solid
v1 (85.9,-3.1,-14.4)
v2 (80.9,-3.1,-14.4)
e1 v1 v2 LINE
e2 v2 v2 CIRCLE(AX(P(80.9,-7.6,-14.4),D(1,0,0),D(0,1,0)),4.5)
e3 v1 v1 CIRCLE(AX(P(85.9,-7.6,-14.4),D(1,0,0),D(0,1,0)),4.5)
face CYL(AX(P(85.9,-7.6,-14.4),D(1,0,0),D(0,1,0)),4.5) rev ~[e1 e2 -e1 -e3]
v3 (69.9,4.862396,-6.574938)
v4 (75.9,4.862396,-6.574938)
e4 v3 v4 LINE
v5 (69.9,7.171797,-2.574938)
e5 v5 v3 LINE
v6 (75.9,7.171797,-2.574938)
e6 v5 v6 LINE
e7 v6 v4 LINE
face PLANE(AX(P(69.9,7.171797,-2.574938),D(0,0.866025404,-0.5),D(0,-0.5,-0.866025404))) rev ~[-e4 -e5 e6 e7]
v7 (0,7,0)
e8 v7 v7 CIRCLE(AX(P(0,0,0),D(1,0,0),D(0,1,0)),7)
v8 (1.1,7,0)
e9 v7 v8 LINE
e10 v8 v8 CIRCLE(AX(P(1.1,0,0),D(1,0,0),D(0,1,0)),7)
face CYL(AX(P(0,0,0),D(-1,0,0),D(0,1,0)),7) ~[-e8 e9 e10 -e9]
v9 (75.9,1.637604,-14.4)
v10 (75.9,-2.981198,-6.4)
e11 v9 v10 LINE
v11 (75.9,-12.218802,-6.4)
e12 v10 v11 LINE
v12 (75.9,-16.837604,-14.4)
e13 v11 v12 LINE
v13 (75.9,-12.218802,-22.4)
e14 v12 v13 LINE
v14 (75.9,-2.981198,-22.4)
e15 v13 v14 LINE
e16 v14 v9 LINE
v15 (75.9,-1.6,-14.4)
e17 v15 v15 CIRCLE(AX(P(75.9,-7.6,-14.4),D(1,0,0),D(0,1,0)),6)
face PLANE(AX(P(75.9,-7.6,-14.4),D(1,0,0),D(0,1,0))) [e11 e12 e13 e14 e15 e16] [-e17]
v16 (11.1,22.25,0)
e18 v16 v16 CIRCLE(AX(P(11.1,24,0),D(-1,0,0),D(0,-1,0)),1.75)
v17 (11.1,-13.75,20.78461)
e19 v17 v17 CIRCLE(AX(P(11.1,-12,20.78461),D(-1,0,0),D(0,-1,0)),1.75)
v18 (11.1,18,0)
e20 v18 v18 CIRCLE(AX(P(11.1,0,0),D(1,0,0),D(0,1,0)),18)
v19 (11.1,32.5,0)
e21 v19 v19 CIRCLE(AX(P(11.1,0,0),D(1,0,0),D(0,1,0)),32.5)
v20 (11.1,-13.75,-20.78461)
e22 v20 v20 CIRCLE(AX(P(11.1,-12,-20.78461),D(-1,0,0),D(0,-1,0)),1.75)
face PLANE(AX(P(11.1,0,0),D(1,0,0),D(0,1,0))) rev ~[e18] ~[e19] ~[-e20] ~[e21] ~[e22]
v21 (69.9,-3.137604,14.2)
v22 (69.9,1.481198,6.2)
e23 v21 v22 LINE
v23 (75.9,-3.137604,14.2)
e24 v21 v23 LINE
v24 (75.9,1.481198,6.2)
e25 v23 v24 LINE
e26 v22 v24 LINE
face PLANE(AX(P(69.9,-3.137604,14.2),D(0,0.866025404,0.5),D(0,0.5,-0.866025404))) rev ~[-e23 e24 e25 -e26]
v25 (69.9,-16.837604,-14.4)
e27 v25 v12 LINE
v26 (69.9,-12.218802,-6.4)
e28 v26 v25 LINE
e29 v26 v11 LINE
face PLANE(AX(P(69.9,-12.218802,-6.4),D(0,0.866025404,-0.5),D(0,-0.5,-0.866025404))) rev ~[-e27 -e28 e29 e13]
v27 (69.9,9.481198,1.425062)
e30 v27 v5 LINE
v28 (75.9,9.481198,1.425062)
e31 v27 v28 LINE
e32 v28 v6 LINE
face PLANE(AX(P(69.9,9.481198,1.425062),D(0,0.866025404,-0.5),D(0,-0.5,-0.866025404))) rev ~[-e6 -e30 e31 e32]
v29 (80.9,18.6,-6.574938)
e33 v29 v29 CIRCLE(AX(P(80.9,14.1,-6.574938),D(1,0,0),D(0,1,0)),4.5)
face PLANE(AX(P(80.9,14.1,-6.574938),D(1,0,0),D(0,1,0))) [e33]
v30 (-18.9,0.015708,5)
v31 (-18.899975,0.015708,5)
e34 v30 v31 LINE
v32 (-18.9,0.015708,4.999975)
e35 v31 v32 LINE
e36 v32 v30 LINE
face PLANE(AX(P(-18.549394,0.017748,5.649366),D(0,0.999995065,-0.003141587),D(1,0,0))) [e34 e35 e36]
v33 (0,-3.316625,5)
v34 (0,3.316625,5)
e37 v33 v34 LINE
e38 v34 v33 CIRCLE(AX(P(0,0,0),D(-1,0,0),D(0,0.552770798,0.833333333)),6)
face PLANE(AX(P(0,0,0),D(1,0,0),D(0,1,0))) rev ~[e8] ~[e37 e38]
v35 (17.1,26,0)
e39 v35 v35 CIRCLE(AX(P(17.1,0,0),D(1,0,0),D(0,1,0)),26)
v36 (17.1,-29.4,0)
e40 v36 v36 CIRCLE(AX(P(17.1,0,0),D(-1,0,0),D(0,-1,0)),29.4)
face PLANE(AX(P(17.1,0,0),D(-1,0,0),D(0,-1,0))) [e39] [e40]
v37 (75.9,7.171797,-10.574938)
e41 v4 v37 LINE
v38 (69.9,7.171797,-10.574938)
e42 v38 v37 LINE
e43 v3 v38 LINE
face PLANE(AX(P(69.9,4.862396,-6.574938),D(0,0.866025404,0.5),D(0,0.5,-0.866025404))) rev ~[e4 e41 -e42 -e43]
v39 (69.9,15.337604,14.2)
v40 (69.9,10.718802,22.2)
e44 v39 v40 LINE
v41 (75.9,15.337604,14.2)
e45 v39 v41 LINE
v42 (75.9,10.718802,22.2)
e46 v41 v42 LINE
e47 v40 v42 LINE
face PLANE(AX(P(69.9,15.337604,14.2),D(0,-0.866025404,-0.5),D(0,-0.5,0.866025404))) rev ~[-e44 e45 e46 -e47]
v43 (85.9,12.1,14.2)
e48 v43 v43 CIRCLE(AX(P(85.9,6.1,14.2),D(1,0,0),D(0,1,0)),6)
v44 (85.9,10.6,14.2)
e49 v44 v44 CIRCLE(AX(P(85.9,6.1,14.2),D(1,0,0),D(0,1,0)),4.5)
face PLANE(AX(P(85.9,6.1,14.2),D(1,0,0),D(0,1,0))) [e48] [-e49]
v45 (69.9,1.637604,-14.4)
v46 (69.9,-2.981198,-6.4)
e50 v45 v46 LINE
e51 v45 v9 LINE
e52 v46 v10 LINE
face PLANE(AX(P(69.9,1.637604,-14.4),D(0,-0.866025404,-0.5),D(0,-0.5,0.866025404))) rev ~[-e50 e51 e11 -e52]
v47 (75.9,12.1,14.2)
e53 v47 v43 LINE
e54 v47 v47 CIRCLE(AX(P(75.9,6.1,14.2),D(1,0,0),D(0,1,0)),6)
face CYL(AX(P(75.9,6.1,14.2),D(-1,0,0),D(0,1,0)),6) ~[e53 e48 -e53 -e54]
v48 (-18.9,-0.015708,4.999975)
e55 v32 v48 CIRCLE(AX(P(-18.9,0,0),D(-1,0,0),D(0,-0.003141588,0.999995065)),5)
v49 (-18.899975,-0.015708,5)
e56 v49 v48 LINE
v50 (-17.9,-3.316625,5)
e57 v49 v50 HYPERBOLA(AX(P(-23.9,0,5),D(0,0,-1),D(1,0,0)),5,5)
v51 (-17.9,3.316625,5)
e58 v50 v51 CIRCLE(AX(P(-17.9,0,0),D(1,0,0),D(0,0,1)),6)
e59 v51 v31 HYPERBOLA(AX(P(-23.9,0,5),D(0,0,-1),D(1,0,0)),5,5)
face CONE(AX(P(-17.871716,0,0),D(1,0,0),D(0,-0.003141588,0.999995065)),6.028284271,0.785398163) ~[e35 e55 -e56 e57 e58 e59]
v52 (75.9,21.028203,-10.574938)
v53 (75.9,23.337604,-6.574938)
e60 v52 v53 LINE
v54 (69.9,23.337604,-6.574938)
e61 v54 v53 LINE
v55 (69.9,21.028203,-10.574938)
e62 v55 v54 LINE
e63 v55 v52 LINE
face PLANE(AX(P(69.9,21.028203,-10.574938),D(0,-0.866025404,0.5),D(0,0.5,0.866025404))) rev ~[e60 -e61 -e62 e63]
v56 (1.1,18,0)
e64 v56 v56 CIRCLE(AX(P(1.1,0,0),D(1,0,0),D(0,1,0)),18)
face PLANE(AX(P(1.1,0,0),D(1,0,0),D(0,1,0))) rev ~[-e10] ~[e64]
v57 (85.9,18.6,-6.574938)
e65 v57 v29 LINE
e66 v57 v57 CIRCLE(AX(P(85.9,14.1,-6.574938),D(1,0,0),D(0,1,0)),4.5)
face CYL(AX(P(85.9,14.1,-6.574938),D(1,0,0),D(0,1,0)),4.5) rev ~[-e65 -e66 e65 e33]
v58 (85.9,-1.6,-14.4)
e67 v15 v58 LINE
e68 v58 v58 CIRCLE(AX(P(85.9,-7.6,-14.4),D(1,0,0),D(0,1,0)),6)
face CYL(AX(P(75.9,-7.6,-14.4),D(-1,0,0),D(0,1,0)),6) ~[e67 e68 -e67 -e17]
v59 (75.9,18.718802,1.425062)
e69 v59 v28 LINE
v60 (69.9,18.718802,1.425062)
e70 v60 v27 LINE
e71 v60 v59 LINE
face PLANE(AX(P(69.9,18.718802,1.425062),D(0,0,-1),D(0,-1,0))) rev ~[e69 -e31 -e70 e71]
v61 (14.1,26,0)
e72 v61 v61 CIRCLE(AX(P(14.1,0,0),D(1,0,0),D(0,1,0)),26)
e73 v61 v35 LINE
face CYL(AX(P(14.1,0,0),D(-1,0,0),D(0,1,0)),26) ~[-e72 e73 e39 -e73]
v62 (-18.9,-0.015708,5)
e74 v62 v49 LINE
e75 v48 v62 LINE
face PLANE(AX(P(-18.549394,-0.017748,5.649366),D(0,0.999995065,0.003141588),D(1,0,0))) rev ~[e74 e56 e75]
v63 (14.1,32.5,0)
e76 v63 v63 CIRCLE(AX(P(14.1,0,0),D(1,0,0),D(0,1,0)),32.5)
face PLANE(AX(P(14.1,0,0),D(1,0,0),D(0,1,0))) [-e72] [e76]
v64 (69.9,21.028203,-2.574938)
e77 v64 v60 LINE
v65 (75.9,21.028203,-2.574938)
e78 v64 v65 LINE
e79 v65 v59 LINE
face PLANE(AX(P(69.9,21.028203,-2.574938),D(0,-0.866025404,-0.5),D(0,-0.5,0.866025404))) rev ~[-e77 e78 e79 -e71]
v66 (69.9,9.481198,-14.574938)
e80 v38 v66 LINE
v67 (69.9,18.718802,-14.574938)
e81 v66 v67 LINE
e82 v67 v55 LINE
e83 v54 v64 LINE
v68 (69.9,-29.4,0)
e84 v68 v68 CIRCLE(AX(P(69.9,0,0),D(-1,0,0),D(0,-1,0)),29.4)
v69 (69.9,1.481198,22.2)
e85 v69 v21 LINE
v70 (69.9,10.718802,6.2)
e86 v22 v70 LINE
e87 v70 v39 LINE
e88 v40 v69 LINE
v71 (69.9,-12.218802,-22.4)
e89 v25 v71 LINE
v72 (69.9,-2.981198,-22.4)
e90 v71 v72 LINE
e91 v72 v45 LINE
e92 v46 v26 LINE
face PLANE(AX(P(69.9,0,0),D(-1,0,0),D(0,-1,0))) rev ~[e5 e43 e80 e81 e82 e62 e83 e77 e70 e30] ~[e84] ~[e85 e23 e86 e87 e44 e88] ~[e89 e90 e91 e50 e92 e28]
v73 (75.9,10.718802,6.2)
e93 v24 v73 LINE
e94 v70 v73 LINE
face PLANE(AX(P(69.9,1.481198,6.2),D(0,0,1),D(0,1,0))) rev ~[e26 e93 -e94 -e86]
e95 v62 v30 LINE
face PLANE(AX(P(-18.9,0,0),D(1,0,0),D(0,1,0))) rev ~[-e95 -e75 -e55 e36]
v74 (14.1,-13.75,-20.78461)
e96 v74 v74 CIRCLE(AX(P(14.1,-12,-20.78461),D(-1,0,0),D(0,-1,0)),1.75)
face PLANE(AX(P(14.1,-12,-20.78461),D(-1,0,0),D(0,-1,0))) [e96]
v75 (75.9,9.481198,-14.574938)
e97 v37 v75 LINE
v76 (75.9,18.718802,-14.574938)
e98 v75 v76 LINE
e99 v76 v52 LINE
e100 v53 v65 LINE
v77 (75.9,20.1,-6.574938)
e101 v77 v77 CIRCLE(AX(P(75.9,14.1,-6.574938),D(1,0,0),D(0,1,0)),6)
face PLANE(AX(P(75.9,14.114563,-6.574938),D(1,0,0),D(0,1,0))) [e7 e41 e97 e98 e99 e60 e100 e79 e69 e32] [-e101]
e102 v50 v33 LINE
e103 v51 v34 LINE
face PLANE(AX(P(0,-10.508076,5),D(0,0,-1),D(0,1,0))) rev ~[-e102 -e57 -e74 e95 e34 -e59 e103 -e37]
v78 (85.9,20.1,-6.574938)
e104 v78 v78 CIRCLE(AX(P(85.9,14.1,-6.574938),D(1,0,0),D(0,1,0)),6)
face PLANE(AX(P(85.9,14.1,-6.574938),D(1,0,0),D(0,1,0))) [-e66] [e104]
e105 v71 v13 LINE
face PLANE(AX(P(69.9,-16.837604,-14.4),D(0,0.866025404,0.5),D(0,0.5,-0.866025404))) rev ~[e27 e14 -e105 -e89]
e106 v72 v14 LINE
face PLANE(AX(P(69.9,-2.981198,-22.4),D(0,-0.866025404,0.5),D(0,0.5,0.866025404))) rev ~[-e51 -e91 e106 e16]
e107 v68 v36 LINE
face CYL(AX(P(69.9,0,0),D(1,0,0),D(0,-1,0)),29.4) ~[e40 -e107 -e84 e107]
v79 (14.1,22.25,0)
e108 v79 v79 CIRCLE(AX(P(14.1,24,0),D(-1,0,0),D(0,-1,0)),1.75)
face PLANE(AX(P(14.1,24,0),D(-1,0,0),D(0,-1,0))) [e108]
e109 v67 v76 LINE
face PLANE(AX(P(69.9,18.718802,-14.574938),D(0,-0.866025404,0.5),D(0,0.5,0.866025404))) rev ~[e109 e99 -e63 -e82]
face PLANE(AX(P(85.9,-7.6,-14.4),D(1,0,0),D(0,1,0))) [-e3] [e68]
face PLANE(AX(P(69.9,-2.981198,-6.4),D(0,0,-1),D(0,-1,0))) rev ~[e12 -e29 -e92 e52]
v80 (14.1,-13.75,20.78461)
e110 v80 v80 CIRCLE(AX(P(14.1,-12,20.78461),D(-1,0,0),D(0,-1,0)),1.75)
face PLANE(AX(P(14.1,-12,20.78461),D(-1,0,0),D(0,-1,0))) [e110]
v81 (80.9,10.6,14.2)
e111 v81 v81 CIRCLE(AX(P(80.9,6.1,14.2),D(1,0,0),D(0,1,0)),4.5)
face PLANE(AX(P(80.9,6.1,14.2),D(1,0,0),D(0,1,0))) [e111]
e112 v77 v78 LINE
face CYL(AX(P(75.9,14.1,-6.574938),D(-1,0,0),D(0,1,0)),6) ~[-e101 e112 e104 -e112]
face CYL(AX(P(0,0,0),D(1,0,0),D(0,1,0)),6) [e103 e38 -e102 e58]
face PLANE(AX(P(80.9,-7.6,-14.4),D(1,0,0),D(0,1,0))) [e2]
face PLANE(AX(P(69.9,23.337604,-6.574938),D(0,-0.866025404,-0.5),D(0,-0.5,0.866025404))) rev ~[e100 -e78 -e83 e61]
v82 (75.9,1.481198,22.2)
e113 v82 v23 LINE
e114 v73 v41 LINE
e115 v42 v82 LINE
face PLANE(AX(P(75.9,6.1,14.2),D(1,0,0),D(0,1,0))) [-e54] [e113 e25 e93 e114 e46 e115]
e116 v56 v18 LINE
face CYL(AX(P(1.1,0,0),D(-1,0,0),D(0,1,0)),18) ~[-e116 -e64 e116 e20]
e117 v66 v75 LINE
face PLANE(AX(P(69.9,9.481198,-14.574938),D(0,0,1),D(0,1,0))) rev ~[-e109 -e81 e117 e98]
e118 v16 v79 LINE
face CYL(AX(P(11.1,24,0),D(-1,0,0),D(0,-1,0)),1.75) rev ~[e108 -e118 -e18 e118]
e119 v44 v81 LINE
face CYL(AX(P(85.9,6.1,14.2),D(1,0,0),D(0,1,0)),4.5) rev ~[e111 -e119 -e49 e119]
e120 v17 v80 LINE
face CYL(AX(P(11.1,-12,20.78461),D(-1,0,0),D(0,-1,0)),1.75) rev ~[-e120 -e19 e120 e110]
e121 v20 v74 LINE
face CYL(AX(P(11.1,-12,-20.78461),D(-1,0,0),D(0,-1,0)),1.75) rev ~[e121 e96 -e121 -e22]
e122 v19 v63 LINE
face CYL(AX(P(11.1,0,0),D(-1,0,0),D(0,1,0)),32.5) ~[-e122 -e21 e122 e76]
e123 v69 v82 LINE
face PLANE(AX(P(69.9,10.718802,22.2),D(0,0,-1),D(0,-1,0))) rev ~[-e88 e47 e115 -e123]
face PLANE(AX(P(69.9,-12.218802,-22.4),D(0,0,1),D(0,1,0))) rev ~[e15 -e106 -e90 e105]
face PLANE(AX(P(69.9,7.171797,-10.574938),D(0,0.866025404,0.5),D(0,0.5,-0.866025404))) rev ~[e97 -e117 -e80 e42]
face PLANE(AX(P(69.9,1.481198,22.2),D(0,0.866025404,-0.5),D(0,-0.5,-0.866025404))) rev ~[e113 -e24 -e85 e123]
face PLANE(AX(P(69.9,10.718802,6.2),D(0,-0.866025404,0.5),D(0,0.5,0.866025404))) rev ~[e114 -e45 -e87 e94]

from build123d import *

# Parameters (mm, degrees)
F0_R        = 6
F1_DEPTH    = 18.9
F2_W        = 21.1690347642
F2_H        = 4.931249544
F3_DEPTH    = 18.901
F4_T2_ANGLE = 359.64
F5_R        = 7
F6_DEPTH    = 1.1
F7_R        = 18
F8_DEPTH    = 10
F9_R        = 32.5
F10_DEPTH   = 3
F11_R       = 26
F12_DEPTH   = 3
F14_R       = 29.4
F15_DEPTH   = 52.8
F16_R       = 1.75
F17_DEPTH   = 3
F19_DEPTH   = 6
F20_R       = 6
F21_DEPTH   = 10
F22_R       = 4.5
F23_DEPTH   = 5


# Not quite as in the source:
# - a fillet or chamfer that OpenCascade refuses, or shapes differently, is made with other operations: its cross-section is extruded or revolved along the edge and cut away or added


with BuildPart() as f1:
    # F0 (on Right) → F1 (new body)
    with BuildSketch(Plane.YZ):
        Circle(F0_R)
    extrude(amount=-F1_DEPTH)

    # F2 (on Right) → F3 (cut, through all)
    with BuildSketch(Plane.YZ):
        with Locations((0.0764410943, 7.465624772)):
            Rectangle(F2_W, F2_H)
    extrude(amount=-F3_DEPTH, mode=Mode.SUBTRACT)

    # F4: chamfer of 1 on 1 edges, made by hand

    # F4_s1 → F4_t2 (revolve, cut)
    with BuildSketch(Plane(origin=(0, 0, 0), x_dir=(1, 0, 0), z_dir=(0, 0.9999950652, 0.0031415875))):
        with BuildLine():
            Line((-17.8717157288, -6.0282842712), (-18.9282842712, -4.9717157288))
            Line((-18.9282842712, -4.9717157288), (-18.9482842712, -4.9717157288))
            ThreePointArc((-18.9482842712, -4.9717157288), (-18.92, -5.4858578644), (-18.92, -6))
            Line((-18.92, -6), (-18.9, -6.02))
            ThreePointArc((-18.9, -6.02), (-18.3858578644, -6.02), (-17.8717157288, -6.0482842712))
            Line((-17.8717157288, -6.0482842712), (-17.8717157288, -6.0282842712))
        make_face()
    revolve(axis=Axis((-18.9, 0, 0), (1, 0, 0)), revolution_arc=F4_T2_ANGLE, mode=Mode.SUBTRACT)

    # F5 (on face) → F6 (join)
    with BuildSketch(Plane.YZ):
        Circle(F5_R)
    extrude(amount=F6_DEPTH)

    # F7 (on face) → F8 (join)
    with BuildSketch(Plane.YZ.offset(1.1)):
        Circle(F7_R)
    extrude(amount=F8_DEPTH)

    # F9 (on face) → F10 (join)
    with BuildSketch(Plane.YZ.offset(11.1)):
        Circle(F9_R)
    extrude(amount=F10_DEPTH)

    # F11 (on face) → F12 (join)
    with BuildSketch(Plane.YZ.offset(14.1)):
        Circle(F11_R)
    extrude(amount=F12_DEPTH)

    # F14 (on offset) → F15 (join, through all)
    with BuildSketch(Plane(origin=(69.9, 0, 0), x_dir=(0, -1, 0), z_dir=(-1, 0, 0))):
        Circle(F14_R)
    extrude(amount=F15_DEPTH)

    # F16 (on face) → F17 (cut)
    with BuildSketch(Plane(origin=(11.1, 0, 0), x_dir=(0, -1, 0), z_dir=(-1, 0, 0))):
        with Locations((-24, 0)):
            Circle(F16_R)
        with Locations((12, -20.7846096908)):
            Circle(F16_R)
        with Locations((12, 20.7846096908)):
            Circle(F16_R)
    extrude(amount=-F17_DEPTH, mode=Mode.SUBTRACT)

    # F18 (on face) → F19 (join)
    with BuildSketch(Plane.YZ.offset(69.9)):
        with BuildLine():
            ThreePointArc((21.0282031968, -10.574938038), (21.8274066017, -8.6454903731), (22.1, -6.57493798))
            ThreePointArc((22.1, -6.57493798), (21.8274066078, -4.5043856099), (21.0282032207, -2.5749379634))
            ThreePointArc((21.0282032207, -2.5749379634), (18.0999999917, 0.3532652551), (14.1, 1.42506202))
            ThreePointArc((14.1, 1.42506202), (10.1000001451, 0.3532653341), (7.1717969373, -2.5749376897))
            ThreePointArc((7.1717969373, -2.5749376897), (6.1, -6.5749379695), (7.1717969269, -10.5749382522))
            ThreePointArc((7.1717969269, -10.5749382522), (10.1000001361, -13.5031412888), (14.1, -14.57493798))
            ThreePointArc((14.1, -14.57493798), (18.099999971, -13.503141227), (21.0282031968, -10.574938038))
        make_face()
        with BuildLine():
            ThreePointArc((21.0282032207, -2.5749379634), (21.8274066078, -4.5043856099), (22.1, -6.57493798))
            ThreePointArc((22.1, -6.57493798), (21.8274066017, -8.6454903731), (21.0282031968, -10.574938038))
            Line((21.0282031968, -10.574938038), (23.337604307, -6.57493798))
            Line((23.337604307, -6.57493798), (21.0282032207, -2.5749379634))
        make_face()
        with BuildLine():
            ThreePointArc((14.1, 1.42506202), (18.0999999917, 0.3532652551), (21.0282032207, -2.5749379634))
            Line((21.0282032207, -2.5749379634), (18.7188021535, 1.42506202))
            Line((18.7188021535, 1.42506202), (14.1, 1.42506202))
        make_face()
        with BuildLine():
            Line((18.7188021535, -14.57493798), (21.0282031968, -10.574938038))
            ThreePointArc((21.0282031968, -10.574938038), (18.099999971, -13.503141227), (14.1, -14.57493798))
            Line((14.1, -14.57493798), (18.7188021535, -14.57493798))
        make_face()
        with BuildLine():
            ThreePointArc((7.1717969373, -2.5749376897), (10.1000001451, 0.3532653341), (14.1, 1.42506202))
            Line((14.1, 1.42506202), (9.4811978465, 1.42506202))
            Line((9.4811978465, 1.42506202), (7.1717969373, -2.5749376897))
        make_face()
        with BuildLine():
            Line((9.4811978465, -14.57493798), (14.1, -14.57493798))
            ThreePointArc((14.1, -14.57493798), (10.1000001361, -13.5031412888), (7.1717969269, -10.5749382522))
            Line((7.1717969269, -10.5749382522), (9.4811978465, -14.57493798))
        make_face()
        with BuildLine():
            ThreePointArc((7.1717969269, -10.5749382522), (6.1, -6.5749379695), (7.1717969373, -2.5749376897))
            Line((7.1717969373, -2.5749376897), (4.862395693, -6.57493798))
            Line((4.862395693, -6.57493798), (7.1717969269, -10.5749382522))
        make_face()
        Polygon((10.7188021535, 22.2), (1.4811978465, 22.2), (-3.137604307, 14.2), (1.4811978465, 6.2), (10.7188021535, 6.2), (15.337604307, 14.2), align=None)
        Polygon((-2.9811978465, -6.4), (-12.2188021535, -6.4), (-16.837604307, -14.4), (-12.2188021535, -22.4), (-2.9811978465, -22.4), (1.637604307, -14.4), align=None)
    extrude(amount=F19_DEPTH)

    # F20 (on face) → F21 (join)
    with BuildSketch(Plane.YZ.offset(75.9)):
        with Locations((6.1, 14.2)):
            Circle(F20_R)
        with Locations((14.1, -6.57493798)):
            Circle(F20_R)
        with Locations((-7.6, -14.4)):
            Circle(F20_R)
    extrude(amount=F21_DEPTH)

    # F22 (on face) → F23 (cut)
    with BuildSketch(Plane.YZ.offset(85.9)):
        with Locations((6.1, 14.2)):
            Circle(F22_R)
        with Locations((-7.6, -14.4)):
            Circle(F22_R)
        with Locations((14.1, -6.57493798)):
            Circle(F22_R)
    extrude(amount=-F23_DEPTH, mode=Mode.SUBTRACT)


solid = f1.part
